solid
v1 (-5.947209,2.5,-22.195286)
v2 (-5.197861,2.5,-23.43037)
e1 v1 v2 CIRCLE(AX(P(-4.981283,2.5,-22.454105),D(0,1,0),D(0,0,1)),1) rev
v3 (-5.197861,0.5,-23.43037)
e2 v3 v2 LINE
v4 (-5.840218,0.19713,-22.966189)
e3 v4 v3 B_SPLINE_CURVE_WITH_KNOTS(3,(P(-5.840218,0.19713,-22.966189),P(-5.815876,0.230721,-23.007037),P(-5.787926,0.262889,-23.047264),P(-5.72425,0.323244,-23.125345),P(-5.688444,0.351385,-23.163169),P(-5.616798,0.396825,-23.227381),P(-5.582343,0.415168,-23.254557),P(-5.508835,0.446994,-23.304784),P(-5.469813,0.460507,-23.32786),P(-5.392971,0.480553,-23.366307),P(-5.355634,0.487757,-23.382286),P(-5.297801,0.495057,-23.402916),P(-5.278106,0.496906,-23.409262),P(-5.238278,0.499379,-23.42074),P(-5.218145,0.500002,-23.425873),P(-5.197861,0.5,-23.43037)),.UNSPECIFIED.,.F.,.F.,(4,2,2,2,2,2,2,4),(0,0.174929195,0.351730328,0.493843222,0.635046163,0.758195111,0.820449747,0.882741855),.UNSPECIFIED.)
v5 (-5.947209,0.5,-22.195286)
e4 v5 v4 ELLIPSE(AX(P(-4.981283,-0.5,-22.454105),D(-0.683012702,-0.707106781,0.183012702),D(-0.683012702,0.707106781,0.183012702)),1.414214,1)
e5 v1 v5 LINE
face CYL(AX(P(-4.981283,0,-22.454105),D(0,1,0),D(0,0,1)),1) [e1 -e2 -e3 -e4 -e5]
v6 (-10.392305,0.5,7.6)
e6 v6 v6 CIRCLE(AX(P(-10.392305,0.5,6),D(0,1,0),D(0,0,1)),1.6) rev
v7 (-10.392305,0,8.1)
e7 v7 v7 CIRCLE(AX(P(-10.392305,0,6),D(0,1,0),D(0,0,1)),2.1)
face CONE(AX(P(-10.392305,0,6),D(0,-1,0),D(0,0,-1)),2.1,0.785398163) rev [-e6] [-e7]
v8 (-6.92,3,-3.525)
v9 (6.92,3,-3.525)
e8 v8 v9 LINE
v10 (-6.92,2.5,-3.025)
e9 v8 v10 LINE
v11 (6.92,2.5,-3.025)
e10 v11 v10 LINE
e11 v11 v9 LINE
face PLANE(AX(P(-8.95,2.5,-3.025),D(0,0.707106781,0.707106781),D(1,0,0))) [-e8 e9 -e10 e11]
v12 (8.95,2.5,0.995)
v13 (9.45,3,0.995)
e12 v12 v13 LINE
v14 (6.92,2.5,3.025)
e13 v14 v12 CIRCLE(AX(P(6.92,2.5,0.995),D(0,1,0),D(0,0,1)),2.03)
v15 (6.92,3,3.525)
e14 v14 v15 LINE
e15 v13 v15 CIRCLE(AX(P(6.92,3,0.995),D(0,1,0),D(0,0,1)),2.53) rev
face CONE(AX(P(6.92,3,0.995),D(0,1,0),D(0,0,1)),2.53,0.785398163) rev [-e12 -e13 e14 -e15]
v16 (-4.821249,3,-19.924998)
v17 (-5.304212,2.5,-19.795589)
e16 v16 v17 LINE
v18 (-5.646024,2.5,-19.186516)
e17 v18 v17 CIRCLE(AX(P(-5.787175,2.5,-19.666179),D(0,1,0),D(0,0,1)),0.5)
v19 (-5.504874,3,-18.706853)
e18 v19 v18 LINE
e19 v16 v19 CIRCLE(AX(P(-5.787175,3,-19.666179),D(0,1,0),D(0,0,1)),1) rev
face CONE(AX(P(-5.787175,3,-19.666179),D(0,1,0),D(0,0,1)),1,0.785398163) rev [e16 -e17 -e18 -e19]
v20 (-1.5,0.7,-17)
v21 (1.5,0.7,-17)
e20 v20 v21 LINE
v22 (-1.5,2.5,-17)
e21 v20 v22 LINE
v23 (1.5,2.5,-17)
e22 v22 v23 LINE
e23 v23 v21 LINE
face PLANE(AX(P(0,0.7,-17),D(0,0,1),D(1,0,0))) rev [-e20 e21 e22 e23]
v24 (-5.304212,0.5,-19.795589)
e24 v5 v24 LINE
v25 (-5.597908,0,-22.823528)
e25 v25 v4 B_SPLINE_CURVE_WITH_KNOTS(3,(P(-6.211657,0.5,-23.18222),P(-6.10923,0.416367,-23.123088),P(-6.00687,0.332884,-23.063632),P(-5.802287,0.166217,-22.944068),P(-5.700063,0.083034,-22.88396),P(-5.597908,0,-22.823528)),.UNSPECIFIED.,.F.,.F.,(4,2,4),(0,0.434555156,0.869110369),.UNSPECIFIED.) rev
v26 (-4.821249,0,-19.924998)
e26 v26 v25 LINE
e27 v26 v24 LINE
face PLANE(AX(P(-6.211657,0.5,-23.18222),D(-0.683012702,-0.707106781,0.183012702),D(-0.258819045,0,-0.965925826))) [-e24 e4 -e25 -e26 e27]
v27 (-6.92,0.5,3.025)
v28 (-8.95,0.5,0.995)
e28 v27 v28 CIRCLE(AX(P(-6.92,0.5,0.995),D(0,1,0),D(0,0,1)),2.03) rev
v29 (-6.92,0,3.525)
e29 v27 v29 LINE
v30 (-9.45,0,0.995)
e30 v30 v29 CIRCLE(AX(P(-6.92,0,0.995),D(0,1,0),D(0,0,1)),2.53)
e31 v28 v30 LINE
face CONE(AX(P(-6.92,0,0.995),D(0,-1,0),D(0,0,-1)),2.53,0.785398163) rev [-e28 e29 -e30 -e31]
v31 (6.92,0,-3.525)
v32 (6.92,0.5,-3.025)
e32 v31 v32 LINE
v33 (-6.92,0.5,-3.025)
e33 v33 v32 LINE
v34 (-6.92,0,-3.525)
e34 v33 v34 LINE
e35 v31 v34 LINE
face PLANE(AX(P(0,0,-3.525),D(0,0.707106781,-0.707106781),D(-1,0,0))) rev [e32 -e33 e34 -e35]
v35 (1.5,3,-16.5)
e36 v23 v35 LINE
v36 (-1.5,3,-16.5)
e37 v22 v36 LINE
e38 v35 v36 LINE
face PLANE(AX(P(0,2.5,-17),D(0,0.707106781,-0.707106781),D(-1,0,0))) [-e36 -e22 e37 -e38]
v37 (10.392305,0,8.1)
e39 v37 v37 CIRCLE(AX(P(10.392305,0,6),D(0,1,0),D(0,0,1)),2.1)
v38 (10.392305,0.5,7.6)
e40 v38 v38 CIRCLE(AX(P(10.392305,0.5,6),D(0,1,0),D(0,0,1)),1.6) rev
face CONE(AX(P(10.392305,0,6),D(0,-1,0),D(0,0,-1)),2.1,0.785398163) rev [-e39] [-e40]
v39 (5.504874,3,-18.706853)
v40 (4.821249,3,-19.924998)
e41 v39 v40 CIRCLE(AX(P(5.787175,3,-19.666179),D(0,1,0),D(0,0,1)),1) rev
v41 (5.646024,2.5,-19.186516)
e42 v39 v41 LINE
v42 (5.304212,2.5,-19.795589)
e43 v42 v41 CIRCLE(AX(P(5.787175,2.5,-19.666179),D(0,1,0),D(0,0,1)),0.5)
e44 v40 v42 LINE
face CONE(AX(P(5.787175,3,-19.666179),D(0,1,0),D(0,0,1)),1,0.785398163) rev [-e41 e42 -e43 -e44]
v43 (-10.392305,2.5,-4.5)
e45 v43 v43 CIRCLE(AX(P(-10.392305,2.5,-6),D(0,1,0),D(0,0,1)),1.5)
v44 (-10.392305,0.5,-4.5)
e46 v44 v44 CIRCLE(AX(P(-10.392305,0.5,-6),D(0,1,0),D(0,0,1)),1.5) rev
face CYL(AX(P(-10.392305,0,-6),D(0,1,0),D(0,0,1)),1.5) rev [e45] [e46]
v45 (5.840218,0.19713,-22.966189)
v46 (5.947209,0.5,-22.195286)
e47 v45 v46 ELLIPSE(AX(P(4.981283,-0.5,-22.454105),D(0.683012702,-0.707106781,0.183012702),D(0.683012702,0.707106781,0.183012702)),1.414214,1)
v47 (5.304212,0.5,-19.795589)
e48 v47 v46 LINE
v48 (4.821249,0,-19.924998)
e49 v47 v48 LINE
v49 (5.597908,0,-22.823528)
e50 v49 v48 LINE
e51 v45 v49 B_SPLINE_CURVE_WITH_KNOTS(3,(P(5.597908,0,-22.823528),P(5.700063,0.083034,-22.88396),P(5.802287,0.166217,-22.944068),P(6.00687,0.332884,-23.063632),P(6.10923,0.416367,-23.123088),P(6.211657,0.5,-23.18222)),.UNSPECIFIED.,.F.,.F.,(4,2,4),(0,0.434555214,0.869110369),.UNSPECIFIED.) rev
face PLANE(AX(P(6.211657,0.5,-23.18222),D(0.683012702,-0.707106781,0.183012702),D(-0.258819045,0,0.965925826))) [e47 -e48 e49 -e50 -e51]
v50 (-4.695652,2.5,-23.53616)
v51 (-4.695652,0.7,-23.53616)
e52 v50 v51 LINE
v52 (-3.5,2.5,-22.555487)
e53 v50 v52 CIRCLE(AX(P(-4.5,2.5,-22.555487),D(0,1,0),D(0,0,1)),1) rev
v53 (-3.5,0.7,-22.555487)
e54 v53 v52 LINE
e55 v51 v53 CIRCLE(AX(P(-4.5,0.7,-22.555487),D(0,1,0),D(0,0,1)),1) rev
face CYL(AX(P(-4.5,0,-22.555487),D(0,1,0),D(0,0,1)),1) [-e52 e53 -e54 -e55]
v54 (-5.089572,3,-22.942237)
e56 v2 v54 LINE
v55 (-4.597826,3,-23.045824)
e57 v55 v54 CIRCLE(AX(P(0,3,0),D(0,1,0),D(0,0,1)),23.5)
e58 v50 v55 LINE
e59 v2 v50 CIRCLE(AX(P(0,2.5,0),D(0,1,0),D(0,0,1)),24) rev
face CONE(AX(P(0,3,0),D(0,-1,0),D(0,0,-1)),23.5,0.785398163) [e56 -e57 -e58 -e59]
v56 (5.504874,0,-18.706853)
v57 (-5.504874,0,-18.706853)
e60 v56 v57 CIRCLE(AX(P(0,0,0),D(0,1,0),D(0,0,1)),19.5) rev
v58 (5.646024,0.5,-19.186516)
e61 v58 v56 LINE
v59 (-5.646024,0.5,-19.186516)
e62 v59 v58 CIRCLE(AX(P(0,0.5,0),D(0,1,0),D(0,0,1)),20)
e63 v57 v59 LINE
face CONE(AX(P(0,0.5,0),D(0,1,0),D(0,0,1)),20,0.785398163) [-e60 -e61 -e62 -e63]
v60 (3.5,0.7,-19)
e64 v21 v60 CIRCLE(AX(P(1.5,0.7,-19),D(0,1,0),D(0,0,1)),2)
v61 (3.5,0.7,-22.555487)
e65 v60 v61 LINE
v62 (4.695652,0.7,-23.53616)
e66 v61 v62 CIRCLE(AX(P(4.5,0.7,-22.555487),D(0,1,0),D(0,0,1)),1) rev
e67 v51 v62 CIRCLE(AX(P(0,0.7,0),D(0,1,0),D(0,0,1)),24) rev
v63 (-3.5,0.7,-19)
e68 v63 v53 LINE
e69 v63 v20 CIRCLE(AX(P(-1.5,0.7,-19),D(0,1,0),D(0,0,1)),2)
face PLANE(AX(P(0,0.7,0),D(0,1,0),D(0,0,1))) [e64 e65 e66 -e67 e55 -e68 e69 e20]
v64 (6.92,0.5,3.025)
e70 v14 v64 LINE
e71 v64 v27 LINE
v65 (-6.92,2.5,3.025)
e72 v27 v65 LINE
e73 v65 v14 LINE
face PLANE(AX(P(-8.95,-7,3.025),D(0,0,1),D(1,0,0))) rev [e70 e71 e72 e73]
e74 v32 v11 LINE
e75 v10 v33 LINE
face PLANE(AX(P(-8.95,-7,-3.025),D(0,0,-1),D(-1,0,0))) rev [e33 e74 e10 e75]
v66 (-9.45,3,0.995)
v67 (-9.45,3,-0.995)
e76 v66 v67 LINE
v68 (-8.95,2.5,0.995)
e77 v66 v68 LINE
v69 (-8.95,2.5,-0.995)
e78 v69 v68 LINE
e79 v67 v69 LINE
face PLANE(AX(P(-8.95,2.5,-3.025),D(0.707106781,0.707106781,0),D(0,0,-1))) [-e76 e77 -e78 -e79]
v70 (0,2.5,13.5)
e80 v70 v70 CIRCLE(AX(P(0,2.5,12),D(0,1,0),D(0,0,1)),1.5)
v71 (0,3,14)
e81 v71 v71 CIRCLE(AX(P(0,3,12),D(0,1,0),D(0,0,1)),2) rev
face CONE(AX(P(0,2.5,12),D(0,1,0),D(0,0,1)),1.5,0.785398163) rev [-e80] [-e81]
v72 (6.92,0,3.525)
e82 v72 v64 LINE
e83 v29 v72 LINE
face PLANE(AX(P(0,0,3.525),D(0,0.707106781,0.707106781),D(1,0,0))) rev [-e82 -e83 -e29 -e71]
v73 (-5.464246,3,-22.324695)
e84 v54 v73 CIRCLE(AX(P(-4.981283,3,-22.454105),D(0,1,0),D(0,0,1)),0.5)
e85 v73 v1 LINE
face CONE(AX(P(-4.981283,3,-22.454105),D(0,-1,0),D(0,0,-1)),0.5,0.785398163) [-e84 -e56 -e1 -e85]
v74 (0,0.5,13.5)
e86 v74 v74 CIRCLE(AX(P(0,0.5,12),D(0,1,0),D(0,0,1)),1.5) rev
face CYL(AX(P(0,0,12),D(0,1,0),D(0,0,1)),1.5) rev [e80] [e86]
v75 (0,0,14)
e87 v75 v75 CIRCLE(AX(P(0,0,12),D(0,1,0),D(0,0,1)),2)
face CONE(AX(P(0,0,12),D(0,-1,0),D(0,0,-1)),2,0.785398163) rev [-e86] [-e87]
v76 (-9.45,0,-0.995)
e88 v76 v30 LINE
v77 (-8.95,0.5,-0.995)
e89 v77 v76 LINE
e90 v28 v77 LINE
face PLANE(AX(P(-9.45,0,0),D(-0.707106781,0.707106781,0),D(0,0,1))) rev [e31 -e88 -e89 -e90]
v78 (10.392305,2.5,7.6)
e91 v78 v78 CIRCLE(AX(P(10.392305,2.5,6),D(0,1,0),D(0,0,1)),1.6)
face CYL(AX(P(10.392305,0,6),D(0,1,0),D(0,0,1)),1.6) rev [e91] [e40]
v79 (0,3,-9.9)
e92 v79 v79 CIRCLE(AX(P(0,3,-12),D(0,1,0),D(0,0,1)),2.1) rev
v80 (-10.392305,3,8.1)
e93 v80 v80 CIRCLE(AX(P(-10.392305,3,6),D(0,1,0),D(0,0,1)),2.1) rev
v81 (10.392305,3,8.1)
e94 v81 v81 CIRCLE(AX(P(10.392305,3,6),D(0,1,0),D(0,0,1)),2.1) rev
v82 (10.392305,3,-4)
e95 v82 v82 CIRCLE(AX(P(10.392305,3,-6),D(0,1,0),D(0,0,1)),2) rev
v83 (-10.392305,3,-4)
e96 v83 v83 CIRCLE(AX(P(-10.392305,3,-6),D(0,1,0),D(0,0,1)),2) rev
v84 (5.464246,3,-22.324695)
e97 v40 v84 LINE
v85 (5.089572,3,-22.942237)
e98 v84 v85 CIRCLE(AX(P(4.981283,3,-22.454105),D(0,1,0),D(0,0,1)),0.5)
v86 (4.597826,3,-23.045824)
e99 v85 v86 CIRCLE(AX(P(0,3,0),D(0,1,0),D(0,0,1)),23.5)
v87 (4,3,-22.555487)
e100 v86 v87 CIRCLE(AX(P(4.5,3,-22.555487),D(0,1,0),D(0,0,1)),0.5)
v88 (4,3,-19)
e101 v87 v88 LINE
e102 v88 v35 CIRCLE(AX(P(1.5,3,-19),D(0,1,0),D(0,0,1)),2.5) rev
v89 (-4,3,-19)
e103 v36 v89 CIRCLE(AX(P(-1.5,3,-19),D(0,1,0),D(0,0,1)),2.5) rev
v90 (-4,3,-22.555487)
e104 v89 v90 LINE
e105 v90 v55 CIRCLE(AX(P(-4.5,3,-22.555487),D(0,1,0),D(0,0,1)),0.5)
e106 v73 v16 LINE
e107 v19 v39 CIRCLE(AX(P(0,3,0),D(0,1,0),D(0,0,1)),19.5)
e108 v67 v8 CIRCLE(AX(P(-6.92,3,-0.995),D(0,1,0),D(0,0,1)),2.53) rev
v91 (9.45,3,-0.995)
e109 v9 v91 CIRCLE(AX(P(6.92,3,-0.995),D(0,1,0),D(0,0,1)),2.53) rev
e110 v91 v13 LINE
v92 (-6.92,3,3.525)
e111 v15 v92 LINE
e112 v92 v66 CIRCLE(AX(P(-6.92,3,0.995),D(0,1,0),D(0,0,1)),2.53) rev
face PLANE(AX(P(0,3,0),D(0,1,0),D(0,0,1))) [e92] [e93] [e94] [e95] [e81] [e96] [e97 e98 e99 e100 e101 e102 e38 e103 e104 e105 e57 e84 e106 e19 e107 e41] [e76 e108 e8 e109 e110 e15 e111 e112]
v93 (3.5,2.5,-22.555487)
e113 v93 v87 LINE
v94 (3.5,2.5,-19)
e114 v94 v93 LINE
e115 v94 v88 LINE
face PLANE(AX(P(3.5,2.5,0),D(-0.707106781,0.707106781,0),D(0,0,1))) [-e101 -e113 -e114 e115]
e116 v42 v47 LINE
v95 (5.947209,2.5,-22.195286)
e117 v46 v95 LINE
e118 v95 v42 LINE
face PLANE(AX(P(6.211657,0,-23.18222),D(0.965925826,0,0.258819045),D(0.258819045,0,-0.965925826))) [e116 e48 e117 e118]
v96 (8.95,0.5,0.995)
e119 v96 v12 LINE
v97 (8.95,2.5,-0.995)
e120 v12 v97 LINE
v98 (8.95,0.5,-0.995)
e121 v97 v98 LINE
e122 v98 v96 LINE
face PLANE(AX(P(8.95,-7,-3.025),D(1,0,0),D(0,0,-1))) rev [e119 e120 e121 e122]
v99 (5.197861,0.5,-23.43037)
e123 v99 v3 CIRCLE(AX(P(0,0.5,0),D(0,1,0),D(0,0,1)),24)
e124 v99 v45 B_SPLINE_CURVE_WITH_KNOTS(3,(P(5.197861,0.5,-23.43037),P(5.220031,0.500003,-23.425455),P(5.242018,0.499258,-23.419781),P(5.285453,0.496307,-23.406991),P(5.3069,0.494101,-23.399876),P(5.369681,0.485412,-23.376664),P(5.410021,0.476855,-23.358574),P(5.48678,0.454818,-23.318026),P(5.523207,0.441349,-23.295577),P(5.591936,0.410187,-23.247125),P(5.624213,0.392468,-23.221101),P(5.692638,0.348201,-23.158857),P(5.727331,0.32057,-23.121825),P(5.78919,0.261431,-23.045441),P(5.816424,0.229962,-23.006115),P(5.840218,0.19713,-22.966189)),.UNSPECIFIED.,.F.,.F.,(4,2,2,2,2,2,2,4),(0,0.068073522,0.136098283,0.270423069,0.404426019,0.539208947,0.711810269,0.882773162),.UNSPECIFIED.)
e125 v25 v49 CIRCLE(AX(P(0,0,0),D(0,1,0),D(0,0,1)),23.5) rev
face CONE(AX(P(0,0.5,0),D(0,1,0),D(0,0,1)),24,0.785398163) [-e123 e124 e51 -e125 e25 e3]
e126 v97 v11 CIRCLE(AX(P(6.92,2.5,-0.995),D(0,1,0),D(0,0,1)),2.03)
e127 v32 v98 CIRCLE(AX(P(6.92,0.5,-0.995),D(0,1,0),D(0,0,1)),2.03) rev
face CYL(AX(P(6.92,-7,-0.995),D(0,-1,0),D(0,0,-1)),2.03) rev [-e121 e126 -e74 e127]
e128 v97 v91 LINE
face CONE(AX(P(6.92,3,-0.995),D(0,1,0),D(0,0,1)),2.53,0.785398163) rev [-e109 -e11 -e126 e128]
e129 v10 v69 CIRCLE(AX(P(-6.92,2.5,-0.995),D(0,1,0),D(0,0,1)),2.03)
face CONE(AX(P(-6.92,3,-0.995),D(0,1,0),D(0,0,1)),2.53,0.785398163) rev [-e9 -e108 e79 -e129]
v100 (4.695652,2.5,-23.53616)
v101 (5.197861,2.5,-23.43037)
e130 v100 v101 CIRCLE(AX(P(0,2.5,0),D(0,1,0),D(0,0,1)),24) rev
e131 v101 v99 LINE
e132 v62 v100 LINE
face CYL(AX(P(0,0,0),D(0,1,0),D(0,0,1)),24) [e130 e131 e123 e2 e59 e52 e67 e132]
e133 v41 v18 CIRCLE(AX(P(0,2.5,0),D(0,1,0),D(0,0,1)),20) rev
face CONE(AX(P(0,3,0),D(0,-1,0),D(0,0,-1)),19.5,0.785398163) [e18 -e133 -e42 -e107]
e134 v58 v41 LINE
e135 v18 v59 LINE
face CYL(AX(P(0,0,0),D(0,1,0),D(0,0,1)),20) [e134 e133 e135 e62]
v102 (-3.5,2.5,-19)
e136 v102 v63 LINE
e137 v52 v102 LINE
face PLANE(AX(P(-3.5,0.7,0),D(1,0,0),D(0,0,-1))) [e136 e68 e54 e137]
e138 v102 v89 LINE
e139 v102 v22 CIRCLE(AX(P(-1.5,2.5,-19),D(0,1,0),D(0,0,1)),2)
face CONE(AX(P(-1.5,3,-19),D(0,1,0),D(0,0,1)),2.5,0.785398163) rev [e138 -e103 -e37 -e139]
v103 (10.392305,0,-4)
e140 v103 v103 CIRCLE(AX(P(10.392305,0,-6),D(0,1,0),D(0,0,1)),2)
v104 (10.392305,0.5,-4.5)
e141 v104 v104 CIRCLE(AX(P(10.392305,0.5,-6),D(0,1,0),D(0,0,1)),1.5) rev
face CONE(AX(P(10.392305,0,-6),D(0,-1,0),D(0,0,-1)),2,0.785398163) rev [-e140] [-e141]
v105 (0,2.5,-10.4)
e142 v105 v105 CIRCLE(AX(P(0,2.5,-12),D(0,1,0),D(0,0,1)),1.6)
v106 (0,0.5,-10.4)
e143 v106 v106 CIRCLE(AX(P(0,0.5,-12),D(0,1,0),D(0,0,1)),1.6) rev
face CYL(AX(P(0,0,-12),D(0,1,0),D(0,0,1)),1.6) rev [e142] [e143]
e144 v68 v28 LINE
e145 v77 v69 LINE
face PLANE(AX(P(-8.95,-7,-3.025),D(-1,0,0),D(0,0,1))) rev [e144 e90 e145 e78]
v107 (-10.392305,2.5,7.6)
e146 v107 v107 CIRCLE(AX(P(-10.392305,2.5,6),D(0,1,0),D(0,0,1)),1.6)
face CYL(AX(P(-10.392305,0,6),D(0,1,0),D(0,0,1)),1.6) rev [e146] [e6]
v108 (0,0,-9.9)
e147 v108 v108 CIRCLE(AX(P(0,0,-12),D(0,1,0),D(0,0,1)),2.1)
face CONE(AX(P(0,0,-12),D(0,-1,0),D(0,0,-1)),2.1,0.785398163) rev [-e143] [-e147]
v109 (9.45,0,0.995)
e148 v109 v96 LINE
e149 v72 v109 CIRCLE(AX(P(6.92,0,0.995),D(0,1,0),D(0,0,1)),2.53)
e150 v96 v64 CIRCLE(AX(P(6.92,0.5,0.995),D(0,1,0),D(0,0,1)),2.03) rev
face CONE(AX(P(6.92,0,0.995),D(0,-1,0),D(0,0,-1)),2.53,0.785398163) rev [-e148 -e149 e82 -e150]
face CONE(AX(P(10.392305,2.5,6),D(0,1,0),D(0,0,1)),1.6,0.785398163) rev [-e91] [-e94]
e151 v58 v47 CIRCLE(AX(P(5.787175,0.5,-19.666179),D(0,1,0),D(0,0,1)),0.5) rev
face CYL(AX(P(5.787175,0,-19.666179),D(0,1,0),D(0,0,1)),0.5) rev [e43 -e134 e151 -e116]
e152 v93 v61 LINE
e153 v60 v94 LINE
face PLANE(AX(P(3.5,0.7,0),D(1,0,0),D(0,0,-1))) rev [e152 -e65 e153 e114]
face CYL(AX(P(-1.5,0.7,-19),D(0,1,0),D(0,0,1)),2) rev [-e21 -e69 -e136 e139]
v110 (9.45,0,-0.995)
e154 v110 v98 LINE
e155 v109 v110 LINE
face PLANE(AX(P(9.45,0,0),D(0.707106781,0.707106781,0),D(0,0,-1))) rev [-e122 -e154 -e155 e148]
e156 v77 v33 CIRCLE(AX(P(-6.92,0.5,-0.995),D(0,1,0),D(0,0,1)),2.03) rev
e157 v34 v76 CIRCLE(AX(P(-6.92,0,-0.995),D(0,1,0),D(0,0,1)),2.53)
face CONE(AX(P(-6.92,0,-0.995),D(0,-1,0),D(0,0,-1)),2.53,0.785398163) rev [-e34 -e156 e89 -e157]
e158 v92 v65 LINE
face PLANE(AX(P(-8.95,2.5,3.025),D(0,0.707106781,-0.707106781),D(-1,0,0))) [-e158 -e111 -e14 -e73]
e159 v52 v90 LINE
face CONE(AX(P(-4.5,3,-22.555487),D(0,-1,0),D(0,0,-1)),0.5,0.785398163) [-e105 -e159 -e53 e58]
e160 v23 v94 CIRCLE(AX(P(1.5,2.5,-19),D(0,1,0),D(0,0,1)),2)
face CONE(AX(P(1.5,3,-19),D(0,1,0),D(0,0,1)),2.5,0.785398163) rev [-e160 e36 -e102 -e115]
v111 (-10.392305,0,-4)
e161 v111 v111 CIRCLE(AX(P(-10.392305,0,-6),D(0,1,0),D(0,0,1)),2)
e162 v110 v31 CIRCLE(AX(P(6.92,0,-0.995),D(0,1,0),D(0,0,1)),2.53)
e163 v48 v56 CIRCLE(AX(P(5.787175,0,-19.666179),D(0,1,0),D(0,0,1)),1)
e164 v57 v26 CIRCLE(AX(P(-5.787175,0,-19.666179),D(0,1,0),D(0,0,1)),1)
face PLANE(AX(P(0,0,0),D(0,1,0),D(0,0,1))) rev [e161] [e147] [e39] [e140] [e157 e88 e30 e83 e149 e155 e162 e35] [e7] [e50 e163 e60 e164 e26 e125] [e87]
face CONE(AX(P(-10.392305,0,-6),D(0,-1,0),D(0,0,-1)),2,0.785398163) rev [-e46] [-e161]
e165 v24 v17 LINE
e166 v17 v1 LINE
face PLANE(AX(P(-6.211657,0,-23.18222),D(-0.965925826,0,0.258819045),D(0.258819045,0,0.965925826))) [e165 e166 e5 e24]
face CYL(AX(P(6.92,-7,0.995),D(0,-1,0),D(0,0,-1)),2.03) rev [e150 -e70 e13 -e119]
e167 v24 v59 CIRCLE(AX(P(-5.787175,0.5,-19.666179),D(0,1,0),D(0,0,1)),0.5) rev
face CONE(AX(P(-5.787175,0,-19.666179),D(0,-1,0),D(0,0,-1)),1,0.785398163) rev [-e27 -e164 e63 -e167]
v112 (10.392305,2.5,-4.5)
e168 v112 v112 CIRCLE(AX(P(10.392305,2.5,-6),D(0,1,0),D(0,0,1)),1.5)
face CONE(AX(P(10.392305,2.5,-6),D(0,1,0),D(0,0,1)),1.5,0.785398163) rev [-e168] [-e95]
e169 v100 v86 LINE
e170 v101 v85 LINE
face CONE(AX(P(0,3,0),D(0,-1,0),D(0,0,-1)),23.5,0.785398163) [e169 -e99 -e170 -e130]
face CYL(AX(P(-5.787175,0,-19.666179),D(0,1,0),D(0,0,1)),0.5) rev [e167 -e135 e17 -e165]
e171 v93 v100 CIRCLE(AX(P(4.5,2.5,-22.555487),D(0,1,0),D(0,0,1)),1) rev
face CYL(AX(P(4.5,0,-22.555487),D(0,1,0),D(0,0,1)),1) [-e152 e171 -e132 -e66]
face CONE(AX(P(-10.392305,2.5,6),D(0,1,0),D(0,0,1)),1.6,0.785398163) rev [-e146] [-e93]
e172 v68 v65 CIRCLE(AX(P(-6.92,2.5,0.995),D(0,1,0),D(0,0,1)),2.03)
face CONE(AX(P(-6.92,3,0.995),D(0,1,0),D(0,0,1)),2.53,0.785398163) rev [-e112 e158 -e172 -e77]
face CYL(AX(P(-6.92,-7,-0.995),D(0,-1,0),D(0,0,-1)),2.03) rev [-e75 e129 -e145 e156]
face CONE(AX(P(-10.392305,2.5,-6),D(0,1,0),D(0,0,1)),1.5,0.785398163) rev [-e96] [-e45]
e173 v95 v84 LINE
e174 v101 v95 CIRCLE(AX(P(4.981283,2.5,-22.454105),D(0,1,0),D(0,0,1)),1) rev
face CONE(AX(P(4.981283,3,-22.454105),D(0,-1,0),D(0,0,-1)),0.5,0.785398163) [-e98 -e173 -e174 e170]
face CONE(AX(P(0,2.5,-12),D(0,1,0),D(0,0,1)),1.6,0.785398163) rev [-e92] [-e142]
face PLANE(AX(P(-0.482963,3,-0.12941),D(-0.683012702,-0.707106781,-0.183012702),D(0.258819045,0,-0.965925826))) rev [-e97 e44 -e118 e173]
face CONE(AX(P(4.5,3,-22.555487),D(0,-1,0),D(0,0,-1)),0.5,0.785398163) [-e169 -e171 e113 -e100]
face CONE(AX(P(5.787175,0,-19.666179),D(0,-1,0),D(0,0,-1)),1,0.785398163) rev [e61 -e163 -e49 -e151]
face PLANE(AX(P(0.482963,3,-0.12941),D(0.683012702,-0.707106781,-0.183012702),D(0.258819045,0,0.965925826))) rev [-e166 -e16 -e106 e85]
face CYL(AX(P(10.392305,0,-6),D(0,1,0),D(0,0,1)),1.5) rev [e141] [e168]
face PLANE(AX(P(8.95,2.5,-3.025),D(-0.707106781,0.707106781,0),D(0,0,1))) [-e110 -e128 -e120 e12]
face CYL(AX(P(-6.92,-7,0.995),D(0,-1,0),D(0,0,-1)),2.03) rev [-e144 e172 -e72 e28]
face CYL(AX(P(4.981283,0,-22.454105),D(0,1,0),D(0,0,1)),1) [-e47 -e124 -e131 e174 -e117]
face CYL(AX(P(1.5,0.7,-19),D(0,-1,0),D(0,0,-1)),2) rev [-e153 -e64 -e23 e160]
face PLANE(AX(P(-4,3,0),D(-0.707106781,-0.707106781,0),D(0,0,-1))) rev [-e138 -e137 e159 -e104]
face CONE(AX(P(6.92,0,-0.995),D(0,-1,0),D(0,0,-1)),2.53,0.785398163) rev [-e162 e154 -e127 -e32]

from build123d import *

# Parameters (mm, degrees)
SKETCH_1_R          = 25
EXTRUDE_1_DEPTH     = 3
SKETCH_2_R          = 1.6
SKETCH_2_R_2        = 1.5
CUT_EXTRUDE_1_DEPTH = 3
CUT_EXTRUDE_START   = -3
SKETCH_3_R          = 25
CUT_EXTRUDE_2_DEPTH = 3
FILLET_1_R          = 0.5
SKETCH_4_W          = 17.9
SKETCH_4_H          = 6.05
CUT_EXTRUDE_3_DEPTH = 10
FILLET_3_R          = 2.03
CUT_EXTRUDE_START_2 = -2.3
CUT_EXTRUDE_5_DEPTH = 2.3
FILLET_4_R          = 2
CHAMFER_1_SIZE      = 0.5
FILLET_7_R          = 1
CHAMFER_3_SIZE      = 0.5


with BuildPart() as part:
    # 草图1 → 凸台-拉伸1 (new body)
    with BuildSketch(Plane(origin=(0, 0, 0), x_dir=(1, 0, 0), z_dir=(0, 1, 0))):
        with Locations(Location((0, 0, 0), (0, 0, 270))):
            Circle(SKETCH_1_R)
    extrude(amount=EXTRUDE_1_DEPTH)

    # 草图2 → 切除-拉伸1 (cut)
    with BuildSketch(Plane(origin=(0, 3, 0), x_dir=(1, 0, 0), z_dir=(0, 1, 0))):
        with Locations(Location((10.392304845, -6, 0), (0, 0, 270))):
            Circle(SKETCH_2_R)
        with Locations(Location((-10.392304845, -6, 0), (0, 0, 270))):
            Circle(SKETCH_2_R)
        with Locations(Location((0, 12, 0), (0, 0, 270))):
            Circle(SKETCH_2_R)
        with Locations(Location((0, -12, 0), (0, 0, 270))):
            Circle(SKETCH_2_R_2)
        with Locations(Location((-10.392304845, 6, 0), (0, 0, 270))):
            Circle(SKETCH_2_R_2)
        with Locations(Location((10.392304845, 6, 0), (0, 0, 270))):
            Circle(SKETCH_2_R_2)
    extrude(amount=-CUT_EXTRUDE_1_DEPTH, mode=Mode.SUBTRACT)

    # 草图3 → 切除-拉伸2 (cut)
    with BuildSketch(Plane(origin=(0, 3, 0), x_dir=(1, 0, 0), z_dir=(0, 1, 0)).offset(CUT_EXTRUDE_START)):
        Circle(SKETCH_3_R)
        with BuildLine():
            Line((-6.211657082, 23.182219831), (-5.176380902, 19.318516526))
            ThreePointArc((-5.176380902, 19.318516526), (0, -20), (5.176380902, 19.318516526))
            Line((5.176380902, 19.318516526), (6.211657082, 23.182219831))
            ThreePointArc((6.211657082, 23.182219831), (0, 24), (-6.211657082, 23.182219831))
        make_face(mode=Mode.SUBTRACT)
    extrude(amount=CUT_EXTRUDE_2_DEPTH, mode=Mode.SUBTRACT)

    # 圆角1
    fillet_1_edges = [part.edges().sort_by_distance(p)[0] for p in [
        (5.176380902, 1.5, -19.318516526),
        (-5.176380902, 1.5, -19.318516526),
    ]]
    fillet(fillet_1_edges, radius=FILLET_1_R)

    # 草图4 → 切除-拉伸3 (cut)
    with BuildSketch(Plane(origin=(0, 3, 0), x_dir=(1, 0, 0), z_dir=(0, 1, 0))):
        Rectangle(SKETCH_4_W, SKETCH_4_H)
    extrude(amount=-CUT_EXTRUDE_3_DEPTH, mode=Mode.SUBTRACT)

    # 圆角3
    fillet_3_edges = [part.edges().sort_by_distance(p)[0] for p in [
        (8.95, 1.5, -3.025),
        (8.95, 1.5, 3.025),
        (-8.95, 1.5, 3.025),
        (-8.95, 1.5, -3.025),
    ]]
    fillet(fillet_3_edges, radius=FILLET_3_R)

    # 草图5 → 切除-拉伸5 (cut)
    with BuildSketch(Plane(origin=(0, 3, 0), x_dir=(1, 0, 0), z_dir=(0, 1, 0)).offset(CUT_EXTRUDE_START_2)):
        with BuildLine():
            Line((-3.5, 23.743420141), (-3.5, 17))
            Line((-3.5, 17), (3.5, 17))
            Line((3.5, 17), (3.5, 23.743420141))
            ThreePointArc((3.5, 23.743420141), (0, 24), (-3.5, 23.743420141))
        make_face()
    extrude(amount=CUT_EXTRUDE_5_DEPTH, mode=Mode.SUBTRACT)

    # 圆角4
    fillet_4_edges = [part.edges().sort_by_distance(p)[0] for p in [
        (-3.5, 1.85, -17),
        (3.5, 1.85, -17),
    ]]
    fillet(fillet_4_edges, radius=FILLET_4_R)

    # 倒角1
    chamfer_1_edges = [part.edges().sort_by_distance(p)[0] for p in [
        (-8.355426766, 0, 2.430426766),
        (-8.355426766, 3, -2.430426766),
        (-8.355426766, 0, -2.430426766),
        (0, 0, 10.5),
        (0, 3, 10.5),
        (-10.392304845, 0, 4.4),
        (-10.392304845, 3, 4.4),
        (10.392304845, 0, -7.5),
        (10.392304845, 3, -7.5),
        (-10.392304845, 0, -7.5),
        (-10.392304845, 3, -7.5),
        (10.392304845, 0, 4.4),
        (10.392304845, 3, 4.4),
        (0, 0, -13.6),
        (0, 3, -13.6),
        (0, 0, -24),
        (-5.757934554, 0, -21.488904301),
        (-5.757934554, 3, -21.488904301),
        (0, 3, 20),
        (0, 0, 20),
        (5.757934554, 3, -21.488904301),
        (5.757934554, 0, -21.488904301),
        (5.351145434, 3, -19.421478878),
        (5.351145434, 0, -19.421478878),
        (-5.351145434, 3, -19.421478878),
        (-5.351145434, 0, -19.421478878),
        (8.95, 3, 0),
        (8.95, 0, 0),
        (0, 3, 3.025),
        (0, 0, 3.025),
        (0, 3, -3.025),
        (0, 0, -3.025),
        (-8.95, 3, 0),
        (-8.95, 0, 0),
        (8.355426766, 3, 2.430426766),
        (8.355426766, 0, 2.430426766),
        (8.355426766, 3, -2.430426766),
        (8.355426766, 0, -2.430426766),
        (-8.355426766, 3, 2.430426766),
    ]]
    chamfer(chamfer_1_edges, length=CHAMFER_1_SIZE)

    # 圆角7
    fillet_7_edges = [part.edges().sort_by_distance(p)[0] for p in [
        (-3.5, 1.85, -23.743420141),
        (3.5, 1.85, -23.743420141),
        (-6.211657082, 1.5, -23.182219831),
        (6.211657082, 1.5, -23.182219831),
    ]]
    fillet(fillet_7_edges, radius=FILLET_7_R)

    # 倒角3
    chamfer_3_edges = [part.edges().sort_by_distance(p)[0] for p in [
        (4.947039166, 3, -23.484607799),
        (3.865828168, 3, -23.328679278),
        (3.5, 3, -20.777743569),
        (2.914213562, 3, -17.585786438),
        (0, 3, -17),
        (-2.914213562, 3, -17.585786438),
        (-3.5, 3, -20.777743569),
        (-4.947039166, 3, -23.484607799),
        (-3.865828168, 3, -23.328679278),
        (5.46233374, 3, -23.33079751),
        (-5.46233374, 3, -23.33079751),
    ]]
    chamfer(chamfer_3_edges, length=CHAMFER_3_SIZE - 0.0001)  # a hair under: the kernel refuses the full size


solid = part.part
